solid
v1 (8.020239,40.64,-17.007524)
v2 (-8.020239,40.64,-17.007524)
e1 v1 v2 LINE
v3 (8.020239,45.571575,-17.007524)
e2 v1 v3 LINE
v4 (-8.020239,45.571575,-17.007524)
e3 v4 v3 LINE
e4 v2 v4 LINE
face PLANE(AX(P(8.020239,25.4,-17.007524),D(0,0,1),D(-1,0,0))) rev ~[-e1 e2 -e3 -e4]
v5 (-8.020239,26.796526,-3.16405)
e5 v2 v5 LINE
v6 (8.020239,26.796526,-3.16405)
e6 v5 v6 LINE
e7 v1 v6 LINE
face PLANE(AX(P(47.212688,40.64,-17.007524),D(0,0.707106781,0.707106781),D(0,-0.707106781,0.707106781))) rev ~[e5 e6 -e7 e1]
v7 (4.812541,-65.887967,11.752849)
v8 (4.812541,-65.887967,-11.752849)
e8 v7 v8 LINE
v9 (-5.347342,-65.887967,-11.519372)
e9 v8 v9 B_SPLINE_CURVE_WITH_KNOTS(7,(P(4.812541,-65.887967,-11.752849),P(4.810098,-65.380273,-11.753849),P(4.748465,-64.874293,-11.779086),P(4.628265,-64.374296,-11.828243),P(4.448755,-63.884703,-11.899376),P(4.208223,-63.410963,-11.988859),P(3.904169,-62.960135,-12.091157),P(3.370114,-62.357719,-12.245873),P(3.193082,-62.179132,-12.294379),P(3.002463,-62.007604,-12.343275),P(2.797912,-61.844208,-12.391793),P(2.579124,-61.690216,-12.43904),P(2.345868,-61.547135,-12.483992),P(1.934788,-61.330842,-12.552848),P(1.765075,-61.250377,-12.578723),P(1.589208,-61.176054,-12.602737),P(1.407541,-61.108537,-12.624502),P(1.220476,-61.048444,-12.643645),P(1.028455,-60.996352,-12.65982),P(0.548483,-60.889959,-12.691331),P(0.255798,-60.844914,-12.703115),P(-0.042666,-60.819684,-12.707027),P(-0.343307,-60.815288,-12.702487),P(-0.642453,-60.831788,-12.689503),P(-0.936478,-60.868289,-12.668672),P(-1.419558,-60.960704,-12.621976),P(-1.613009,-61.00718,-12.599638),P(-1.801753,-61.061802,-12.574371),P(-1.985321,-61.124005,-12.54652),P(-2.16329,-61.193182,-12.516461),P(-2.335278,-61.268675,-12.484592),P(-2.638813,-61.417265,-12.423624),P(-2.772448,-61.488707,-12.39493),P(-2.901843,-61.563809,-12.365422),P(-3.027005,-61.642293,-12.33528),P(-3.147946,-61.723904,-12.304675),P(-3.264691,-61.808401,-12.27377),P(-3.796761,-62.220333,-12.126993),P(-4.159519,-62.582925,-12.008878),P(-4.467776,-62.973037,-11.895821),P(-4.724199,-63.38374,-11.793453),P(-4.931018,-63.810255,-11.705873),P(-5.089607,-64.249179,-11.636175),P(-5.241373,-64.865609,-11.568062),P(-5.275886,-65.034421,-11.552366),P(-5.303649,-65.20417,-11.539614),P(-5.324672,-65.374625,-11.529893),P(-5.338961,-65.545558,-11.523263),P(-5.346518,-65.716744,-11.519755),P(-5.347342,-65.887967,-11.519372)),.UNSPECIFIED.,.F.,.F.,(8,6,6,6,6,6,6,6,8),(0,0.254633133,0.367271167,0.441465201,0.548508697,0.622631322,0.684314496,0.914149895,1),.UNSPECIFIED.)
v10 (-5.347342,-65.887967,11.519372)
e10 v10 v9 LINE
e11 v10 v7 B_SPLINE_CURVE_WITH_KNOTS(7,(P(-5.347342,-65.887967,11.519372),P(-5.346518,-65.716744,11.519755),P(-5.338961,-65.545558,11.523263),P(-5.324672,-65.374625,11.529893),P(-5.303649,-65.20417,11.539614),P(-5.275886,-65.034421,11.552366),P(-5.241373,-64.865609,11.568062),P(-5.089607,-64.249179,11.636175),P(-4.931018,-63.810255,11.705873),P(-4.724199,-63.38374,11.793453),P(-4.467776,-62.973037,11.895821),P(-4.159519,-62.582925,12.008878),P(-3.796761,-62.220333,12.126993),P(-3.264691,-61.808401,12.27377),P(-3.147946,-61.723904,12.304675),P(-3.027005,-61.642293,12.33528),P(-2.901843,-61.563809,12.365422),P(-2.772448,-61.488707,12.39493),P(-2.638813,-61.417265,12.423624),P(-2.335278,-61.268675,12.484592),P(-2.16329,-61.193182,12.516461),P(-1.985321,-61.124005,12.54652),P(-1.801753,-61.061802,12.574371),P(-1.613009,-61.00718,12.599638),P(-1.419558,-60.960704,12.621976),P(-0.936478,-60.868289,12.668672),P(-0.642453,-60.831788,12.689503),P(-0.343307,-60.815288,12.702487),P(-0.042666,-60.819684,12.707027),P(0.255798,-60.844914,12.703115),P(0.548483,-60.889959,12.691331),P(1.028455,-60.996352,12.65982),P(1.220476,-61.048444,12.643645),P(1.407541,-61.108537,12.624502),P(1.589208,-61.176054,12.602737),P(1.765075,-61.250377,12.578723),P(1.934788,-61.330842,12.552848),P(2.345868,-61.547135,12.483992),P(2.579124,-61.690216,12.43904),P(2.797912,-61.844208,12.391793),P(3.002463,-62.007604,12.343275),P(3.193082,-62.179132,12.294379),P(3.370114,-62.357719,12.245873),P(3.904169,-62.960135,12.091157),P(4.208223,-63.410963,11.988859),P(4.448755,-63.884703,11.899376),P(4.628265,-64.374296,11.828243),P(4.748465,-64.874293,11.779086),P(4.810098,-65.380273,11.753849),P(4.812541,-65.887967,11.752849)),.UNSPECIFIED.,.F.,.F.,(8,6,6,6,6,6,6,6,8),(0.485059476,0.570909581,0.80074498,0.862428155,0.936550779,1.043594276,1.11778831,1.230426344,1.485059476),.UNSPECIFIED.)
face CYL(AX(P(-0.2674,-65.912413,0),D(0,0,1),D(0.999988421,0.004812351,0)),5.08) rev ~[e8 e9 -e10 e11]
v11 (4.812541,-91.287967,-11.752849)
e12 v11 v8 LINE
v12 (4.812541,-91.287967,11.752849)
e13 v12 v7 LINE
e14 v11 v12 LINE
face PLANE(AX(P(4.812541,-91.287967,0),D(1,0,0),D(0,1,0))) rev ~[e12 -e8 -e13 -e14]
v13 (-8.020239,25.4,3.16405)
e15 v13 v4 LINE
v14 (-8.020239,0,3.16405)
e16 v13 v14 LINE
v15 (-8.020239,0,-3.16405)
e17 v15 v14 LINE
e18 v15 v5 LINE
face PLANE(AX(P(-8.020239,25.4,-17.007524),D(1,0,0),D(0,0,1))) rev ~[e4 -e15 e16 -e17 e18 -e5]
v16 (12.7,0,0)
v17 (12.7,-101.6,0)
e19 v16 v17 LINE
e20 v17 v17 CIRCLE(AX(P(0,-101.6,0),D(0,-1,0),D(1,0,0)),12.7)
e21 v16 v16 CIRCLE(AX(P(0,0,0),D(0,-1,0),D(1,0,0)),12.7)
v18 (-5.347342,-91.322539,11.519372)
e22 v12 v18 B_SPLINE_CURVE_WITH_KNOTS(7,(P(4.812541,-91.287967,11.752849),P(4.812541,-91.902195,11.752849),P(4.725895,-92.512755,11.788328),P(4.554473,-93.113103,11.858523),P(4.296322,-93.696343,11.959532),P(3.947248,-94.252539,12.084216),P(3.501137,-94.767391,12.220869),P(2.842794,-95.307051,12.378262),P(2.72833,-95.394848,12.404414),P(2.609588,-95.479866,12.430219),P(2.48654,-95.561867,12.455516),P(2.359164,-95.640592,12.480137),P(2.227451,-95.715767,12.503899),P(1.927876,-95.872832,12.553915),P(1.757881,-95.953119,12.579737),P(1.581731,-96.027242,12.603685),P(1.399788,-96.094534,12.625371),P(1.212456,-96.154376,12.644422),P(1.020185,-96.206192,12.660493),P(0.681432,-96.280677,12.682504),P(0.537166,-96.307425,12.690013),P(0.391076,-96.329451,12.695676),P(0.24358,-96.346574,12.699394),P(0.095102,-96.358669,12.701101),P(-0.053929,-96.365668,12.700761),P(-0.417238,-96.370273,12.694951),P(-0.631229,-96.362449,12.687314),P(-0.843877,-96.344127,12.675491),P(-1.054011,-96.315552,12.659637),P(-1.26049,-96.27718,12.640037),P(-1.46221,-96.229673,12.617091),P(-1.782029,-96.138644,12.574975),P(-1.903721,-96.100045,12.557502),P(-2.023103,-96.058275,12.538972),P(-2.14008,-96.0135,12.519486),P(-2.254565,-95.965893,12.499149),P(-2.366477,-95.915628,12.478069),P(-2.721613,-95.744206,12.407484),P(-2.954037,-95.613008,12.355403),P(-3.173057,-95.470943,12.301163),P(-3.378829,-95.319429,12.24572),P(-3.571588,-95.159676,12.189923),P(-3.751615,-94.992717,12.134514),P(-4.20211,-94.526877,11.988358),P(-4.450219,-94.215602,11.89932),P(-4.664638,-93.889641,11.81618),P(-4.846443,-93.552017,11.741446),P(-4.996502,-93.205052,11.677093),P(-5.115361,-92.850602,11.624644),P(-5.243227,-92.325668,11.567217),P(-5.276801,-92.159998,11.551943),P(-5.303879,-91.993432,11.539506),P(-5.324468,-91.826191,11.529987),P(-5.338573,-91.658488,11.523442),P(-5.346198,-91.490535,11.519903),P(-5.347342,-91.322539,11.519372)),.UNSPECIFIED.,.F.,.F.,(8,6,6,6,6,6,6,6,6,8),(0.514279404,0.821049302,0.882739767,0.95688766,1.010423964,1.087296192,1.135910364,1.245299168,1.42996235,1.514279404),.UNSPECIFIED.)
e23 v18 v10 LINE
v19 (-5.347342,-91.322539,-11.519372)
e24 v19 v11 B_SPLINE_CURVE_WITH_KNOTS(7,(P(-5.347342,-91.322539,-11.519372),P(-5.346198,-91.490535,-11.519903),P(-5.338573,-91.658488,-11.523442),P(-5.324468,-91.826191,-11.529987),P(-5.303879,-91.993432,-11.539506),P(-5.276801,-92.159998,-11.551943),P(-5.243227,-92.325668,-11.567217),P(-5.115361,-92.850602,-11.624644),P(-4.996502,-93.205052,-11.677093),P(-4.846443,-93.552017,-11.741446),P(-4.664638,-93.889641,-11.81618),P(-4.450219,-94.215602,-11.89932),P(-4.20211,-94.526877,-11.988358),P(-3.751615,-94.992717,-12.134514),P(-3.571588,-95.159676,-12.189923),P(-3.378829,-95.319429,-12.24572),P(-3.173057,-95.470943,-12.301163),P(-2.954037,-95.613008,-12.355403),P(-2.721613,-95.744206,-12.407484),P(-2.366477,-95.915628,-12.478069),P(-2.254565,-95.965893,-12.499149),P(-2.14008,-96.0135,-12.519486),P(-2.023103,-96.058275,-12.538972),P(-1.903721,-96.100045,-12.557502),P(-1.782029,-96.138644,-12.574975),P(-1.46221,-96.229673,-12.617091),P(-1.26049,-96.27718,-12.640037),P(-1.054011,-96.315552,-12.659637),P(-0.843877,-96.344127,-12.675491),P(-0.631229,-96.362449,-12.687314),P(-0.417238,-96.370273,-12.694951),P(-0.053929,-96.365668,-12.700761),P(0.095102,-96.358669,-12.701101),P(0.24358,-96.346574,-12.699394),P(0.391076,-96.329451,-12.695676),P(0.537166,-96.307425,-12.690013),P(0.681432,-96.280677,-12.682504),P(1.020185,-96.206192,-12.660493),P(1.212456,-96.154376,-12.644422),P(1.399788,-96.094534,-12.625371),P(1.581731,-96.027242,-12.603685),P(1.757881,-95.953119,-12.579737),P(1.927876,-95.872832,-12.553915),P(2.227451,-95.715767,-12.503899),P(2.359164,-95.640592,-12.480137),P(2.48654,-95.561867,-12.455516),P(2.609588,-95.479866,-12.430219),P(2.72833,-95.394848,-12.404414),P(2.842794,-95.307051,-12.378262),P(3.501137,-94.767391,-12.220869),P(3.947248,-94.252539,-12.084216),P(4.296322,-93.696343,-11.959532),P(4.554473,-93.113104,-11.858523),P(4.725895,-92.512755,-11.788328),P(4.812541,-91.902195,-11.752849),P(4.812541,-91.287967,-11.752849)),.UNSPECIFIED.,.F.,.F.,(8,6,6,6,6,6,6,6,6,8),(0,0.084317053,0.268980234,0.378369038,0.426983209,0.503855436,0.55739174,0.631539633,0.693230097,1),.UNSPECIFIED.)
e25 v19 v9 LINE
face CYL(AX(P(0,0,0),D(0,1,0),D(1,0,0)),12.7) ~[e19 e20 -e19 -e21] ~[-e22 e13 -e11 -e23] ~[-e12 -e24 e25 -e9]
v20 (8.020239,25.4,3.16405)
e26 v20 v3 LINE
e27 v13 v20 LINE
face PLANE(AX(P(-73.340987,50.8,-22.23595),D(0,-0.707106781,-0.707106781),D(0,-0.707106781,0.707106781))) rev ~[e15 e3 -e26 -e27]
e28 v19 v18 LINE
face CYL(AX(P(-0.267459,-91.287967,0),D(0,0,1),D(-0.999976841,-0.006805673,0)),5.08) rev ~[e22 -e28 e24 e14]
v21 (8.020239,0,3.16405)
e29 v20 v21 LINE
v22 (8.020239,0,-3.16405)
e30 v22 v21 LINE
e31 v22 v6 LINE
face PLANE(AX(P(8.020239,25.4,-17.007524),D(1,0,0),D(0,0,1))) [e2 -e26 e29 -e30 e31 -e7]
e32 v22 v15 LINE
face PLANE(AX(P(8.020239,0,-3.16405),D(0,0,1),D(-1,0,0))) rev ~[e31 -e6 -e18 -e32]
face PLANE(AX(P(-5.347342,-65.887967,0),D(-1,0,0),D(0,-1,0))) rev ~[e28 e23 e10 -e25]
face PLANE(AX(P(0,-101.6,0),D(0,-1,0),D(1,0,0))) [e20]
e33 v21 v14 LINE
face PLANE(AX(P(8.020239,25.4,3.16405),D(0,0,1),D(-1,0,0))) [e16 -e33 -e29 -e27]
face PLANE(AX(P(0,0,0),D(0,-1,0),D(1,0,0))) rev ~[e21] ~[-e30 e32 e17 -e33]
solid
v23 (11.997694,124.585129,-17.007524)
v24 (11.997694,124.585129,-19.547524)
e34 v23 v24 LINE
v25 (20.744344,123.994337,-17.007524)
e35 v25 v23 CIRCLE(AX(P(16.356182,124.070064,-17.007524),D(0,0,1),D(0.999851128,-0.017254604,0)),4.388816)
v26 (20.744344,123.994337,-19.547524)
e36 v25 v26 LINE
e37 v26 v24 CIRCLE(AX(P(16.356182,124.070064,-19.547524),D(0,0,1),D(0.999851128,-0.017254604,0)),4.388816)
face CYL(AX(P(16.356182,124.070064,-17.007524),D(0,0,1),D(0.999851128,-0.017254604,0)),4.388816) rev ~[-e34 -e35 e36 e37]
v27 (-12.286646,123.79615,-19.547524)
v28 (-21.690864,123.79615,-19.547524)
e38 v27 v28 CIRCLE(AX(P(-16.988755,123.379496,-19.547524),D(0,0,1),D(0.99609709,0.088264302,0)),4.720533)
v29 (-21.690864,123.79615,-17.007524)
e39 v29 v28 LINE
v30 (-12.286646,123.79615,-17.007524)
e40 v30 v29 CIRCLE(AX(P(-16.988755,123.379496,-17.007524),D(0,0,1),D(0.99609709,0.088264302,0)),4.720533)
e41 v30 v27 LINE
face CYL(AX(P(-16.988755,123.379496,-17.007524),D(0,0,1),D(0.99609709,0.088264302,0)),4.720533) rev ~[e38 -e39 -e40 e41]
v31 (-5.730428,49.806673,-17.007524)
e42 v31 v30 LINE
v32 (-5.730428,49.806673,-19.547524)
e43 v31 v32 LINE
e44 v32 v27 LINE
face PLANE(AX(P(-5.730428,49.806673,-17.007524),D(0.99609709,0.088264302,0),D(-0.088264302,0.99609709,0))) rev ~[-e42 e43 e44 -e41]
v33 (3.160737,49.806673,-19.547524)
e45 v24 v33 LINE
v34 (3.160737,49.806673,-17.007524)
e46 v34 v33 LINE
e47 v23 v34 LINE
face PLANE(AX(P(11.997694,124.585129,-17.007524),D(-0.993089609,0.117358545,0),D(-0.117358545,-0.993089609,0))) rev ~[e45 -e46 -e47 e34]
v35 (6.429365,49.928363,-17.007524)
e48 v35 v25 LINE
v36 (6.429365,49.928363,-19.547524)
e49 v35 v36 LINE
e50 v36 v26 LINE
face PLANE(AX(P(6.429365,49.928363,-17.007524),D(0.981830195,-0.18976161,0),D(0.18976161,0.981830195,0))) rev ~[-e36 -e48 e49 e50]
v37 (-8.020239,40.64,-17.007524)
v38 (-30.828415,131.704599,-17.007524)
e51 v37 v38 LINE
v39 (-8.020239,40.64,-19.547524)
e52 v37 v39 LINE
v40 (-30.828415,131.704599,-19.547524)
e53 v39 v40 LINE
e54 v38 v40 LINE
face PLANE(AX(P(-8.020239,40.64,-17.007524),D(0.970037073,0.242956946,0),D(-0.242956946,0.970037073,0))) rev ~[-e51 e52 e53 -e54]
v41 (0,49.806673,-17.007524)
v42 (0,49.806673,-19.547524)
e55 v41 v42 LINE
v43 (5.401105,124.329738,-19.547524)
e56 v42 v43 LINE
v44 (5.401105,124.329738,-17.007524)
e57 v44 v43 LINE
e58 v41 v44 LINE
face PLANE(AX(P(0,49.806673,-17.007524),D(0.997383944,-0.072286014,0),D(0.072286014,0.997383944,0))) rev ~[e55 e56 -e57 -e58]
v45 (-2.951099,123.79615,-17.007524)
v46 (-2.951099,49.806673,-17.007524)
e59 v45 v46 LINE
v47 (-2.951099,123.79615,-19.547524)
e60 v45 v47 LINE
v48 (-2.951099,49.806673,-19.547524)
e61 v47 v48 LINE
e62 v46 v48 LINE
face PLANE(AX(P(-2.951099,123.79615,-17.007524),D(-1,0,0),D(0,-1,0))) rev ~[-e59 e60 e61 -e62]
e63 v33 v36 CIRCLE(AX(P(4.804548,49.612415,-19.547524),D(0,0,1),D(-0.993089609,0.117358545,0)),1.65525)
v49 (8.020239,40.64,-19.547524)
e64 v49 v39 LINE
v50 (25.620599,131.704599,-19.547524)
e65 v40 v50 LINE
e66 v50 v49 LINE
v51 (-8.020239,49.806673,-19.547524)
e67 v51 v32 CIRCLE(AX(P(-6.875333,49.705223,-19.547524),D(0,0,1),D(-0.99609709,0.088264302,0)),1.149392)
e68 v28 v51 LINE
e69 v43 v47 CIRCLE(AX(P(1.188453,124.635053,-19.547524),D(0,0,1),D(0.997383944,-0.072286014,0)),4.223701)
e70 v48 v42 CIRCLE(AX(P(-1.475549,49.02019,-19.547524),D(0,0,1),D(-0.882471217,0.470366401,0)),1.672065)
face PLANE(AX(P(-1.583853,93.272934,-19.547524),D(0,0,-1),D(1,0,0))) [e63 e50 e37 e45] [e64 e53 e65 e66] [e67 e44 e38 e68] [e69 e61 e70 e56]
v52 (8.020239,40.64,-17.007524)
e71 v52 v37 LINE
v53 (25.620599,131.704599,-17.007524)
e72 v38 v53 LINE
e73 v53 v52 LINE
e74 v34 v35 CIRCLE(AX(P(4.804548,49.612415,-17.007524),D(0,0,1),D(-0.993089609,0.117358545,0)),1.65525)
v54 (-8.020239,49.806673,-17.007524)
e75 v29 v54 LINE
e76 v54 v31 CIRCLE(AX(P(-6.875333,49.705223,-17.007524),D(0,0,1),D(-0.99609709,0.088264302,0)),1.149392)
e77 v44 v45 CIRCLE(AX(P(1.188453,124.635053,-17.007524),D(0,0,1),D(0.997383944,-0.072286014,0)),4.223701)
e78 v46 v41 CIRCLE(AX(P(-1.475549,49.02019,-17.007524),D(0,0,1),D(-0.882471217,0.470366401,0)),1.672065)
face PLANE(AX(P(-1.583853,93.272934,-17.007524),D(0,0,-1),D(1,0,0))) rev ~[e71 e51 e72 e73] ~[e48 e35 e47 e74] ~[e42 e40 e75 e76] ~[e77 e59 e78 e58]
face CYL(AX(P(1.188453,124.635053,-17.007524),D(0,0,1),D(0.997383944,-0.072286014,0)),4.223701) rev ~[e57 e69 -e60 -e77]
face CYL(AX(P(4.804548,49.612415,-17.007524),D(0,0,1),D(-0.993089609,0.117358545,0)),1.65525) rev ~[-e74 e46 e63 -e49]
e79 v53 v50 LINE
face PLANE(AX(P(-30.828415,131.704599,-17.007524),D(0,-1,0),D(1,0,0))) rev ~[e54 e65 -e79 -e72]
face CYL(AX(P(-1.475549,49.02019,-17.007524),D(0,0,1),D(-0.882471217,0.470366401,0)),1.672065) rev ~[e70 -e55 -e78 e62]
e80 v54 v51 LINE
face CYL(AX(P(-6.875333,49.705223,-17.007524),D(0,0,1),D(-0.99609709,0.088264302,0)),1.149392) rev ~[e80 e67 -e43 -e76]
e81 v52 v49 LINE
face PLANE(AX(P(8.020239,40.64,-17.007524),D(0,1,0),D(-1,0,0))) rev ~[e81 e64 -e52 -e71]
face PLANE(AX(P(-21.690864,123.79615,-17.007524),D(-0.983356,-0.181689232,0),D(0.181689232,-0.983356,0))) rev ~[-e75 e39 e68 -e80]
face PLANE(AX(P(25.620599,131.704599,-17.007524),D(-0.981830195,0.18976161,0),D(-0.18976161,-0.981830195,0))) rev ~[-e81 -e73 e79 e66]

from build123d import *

# Parameters (mm, degrees)
F0_R        = 12.7
F1_DEPTH    = 101.6
F3_DEPTH    = 12.7
F4_W        = 16.0404779017
F4_H        = 6.3281008042
F5_DEPTH    = 25.4
F6_W        = 16.0404779017
F6_H        = 20.1715745497
F7_DEPTH    = 25.4
F8_T1_DEPTH = 146.6819736904
F9_T4_DEPTH = 94.4253753749
F11_DEPTH   = 2.54
F13_DEPTH   = 2.54


# Not quite as in the source:
# - a fillet or chamfer that OpenCascade refuses, or shapes differently, is made with other operations: its cross-section is extruded or revolved along the edge and cut away or added


with BuildPart() as f1:
    # F0 (on Front) → F1 (new body)
    with BuildSketch(Plane.XZ):
        Circle(F0_R)
    extrude(amount=F1_DEPTH)

    # F2 (on Top) → F3 (cut, symmetric)
    with BuildSketch(Plane.XY):
        with BuildLine():
            Line((-5.3473415828, -65.8879665646), (-5.3473415828, -91.3225393835))
            ThreePointArc((-5.3473415828, -91.3225393835), (-0.2501727202, -96.3679371527), (4.8125407702, -91.2879665646))
            Line((4.8125407702, -91.2879665646), (4.8125407702, -65.8879665646))
            ThreePointArc((4.8125407702, -65.8879665646), (-0.2674004063, -60.8324133101), (-5.3473415828, -65.8879665646))
        make_face()
    extrude(amount=F3_DEPTH, both=True, mode=Mode.SUBTRACT)

    # F4 (on face) → F5 (join)
    with BuildSketch(Plane(origin=(0, 0, 0), x_dir=(-1, 0, 0), z_dir=(0, 1, 0))):
        Rectangle(F4_W, F4_H)
    extrude(amount=F5_DEPTH)

    # F6 (on face) → F7 (join)
    with BuildSketch(Plane(origin=(0, 25.4, 0), x_dir=(-1, 0, 0), z_dir=(0, 1, 0))):
        with Locations((0, -6.9217368728)):
            Rectangle(F6_W, F6_H)
    extrude(amount=F7_DEPTH)

    # F8: chamfer of 25.4 on 1 edges, made by hand

    # F8_s2 → F8_t1 (cut)
    with BuildSketch(Plane.YZ.offset(-73.3409868452)):
        Polygon((50.8, -22.2359495979), (25.4, 3.1640504021), (50.8, 3.1640504021), align=None)
    extrude(amount=F8_T1_DEPTH, mode=Mode.SUBTRACT)

    # F9: chamfer of 15.24 on 1 edges, made by hand


with BuildPart() as f9_tool2:
    # F9_s3 → F9_t4 (new body)
    with BuildSketch(Plane.YZ.offset(47.2126876874)):
        Polygon((40.64, -17.0075241476), (25.4, -1.7675241476), (25.4, -17.0075241476), align=None)
    extrude(amount=-F9_T4_DEPTH)

    split(bisect_by=Plane.XY.offset(-3.1640504021), keep=Keep.BOTTOM)


with BuildPart() as f1_1:
    add(f1.part)

    # F9_t1: cut F9_tool2
    add(f9_tool2.part, mode=Mode.SUBTRACT)


with BuildPart() as f11:
    # F10 (on face) → F11 (new body)
    with BuildSketch(Plane(origin=(0, 0, -17.0075241476), x_dir=(1, 0, 0), z_dir=(0, 0, -1))):
        Polygon((25.6205989037, -131.7045986652), (8.0202389508, -40.64), (-8.0202389508, -40.64), (-30.8284154249, -131.7045986652), align=None)
    extrude(amount=F11_DEPTH)

    # F12 (on face) → F13 (cut)
    with BuildSketch(Plane.XY.offset(-17.0075241476)):
        with BuildLine():
            ThreePointArc((-2.9510988388, 49.8066730797), (-1.4755494194, 47.3481245776), (0, 49.8066730797))
            Line((0, 49.8066730797), (5.4011049135, 124.3297383189))
            ThreePointArc((5.4011049135, 124.3297383189), (0.9191672956, 128.8501607928), (-2.9510988388, 123.7961500883))
            Line((-2.9510988388, 123.7961500883), (-2.9510988388, 49.8066730797))
        make_face()
        with BuildLine():
            ThreePointArc((-8.0202389508, 49.8066730797), (-6.8753334051, 48.5558313222), (-5.7304278594, 49.8066730797))
            Line((-5.7304278594, 49.8066730797), (-12.2866457498, 123.7961500883))
            ThreePointArc((-12.2866457498, 123.7961500883), (-16.9887549329, 128.1000285349), (-21.690864116, 123.7961500883))
            Line((-21.690864116, 123.7961500883), (-8.0202389508, 49.8066730797))
        make_face()
        with BuildLine():
            Line((6.4293653704, 49.9283634126), (20.7443441266, 123.9943369966))
            ThreePointArc((20.7443441266, 123.9943369966), (16.6519501735, 128.448902691), (11.9976941496, 124.5851293206))
            Line((11.9976941496, 124.5851293206), (3.1607365236, 49.8066730797))
            ThreePointArc((3.1607365236, 49.8066730797), (4.8661303133, 47.9583109849), (6.4293653704, 49.9283634126))
        make_face()
    extrude(amount=-F13_DEPTH, mode=Mode.SUBTRACT)


solid = Compound([f1_1.part, f11.part])
